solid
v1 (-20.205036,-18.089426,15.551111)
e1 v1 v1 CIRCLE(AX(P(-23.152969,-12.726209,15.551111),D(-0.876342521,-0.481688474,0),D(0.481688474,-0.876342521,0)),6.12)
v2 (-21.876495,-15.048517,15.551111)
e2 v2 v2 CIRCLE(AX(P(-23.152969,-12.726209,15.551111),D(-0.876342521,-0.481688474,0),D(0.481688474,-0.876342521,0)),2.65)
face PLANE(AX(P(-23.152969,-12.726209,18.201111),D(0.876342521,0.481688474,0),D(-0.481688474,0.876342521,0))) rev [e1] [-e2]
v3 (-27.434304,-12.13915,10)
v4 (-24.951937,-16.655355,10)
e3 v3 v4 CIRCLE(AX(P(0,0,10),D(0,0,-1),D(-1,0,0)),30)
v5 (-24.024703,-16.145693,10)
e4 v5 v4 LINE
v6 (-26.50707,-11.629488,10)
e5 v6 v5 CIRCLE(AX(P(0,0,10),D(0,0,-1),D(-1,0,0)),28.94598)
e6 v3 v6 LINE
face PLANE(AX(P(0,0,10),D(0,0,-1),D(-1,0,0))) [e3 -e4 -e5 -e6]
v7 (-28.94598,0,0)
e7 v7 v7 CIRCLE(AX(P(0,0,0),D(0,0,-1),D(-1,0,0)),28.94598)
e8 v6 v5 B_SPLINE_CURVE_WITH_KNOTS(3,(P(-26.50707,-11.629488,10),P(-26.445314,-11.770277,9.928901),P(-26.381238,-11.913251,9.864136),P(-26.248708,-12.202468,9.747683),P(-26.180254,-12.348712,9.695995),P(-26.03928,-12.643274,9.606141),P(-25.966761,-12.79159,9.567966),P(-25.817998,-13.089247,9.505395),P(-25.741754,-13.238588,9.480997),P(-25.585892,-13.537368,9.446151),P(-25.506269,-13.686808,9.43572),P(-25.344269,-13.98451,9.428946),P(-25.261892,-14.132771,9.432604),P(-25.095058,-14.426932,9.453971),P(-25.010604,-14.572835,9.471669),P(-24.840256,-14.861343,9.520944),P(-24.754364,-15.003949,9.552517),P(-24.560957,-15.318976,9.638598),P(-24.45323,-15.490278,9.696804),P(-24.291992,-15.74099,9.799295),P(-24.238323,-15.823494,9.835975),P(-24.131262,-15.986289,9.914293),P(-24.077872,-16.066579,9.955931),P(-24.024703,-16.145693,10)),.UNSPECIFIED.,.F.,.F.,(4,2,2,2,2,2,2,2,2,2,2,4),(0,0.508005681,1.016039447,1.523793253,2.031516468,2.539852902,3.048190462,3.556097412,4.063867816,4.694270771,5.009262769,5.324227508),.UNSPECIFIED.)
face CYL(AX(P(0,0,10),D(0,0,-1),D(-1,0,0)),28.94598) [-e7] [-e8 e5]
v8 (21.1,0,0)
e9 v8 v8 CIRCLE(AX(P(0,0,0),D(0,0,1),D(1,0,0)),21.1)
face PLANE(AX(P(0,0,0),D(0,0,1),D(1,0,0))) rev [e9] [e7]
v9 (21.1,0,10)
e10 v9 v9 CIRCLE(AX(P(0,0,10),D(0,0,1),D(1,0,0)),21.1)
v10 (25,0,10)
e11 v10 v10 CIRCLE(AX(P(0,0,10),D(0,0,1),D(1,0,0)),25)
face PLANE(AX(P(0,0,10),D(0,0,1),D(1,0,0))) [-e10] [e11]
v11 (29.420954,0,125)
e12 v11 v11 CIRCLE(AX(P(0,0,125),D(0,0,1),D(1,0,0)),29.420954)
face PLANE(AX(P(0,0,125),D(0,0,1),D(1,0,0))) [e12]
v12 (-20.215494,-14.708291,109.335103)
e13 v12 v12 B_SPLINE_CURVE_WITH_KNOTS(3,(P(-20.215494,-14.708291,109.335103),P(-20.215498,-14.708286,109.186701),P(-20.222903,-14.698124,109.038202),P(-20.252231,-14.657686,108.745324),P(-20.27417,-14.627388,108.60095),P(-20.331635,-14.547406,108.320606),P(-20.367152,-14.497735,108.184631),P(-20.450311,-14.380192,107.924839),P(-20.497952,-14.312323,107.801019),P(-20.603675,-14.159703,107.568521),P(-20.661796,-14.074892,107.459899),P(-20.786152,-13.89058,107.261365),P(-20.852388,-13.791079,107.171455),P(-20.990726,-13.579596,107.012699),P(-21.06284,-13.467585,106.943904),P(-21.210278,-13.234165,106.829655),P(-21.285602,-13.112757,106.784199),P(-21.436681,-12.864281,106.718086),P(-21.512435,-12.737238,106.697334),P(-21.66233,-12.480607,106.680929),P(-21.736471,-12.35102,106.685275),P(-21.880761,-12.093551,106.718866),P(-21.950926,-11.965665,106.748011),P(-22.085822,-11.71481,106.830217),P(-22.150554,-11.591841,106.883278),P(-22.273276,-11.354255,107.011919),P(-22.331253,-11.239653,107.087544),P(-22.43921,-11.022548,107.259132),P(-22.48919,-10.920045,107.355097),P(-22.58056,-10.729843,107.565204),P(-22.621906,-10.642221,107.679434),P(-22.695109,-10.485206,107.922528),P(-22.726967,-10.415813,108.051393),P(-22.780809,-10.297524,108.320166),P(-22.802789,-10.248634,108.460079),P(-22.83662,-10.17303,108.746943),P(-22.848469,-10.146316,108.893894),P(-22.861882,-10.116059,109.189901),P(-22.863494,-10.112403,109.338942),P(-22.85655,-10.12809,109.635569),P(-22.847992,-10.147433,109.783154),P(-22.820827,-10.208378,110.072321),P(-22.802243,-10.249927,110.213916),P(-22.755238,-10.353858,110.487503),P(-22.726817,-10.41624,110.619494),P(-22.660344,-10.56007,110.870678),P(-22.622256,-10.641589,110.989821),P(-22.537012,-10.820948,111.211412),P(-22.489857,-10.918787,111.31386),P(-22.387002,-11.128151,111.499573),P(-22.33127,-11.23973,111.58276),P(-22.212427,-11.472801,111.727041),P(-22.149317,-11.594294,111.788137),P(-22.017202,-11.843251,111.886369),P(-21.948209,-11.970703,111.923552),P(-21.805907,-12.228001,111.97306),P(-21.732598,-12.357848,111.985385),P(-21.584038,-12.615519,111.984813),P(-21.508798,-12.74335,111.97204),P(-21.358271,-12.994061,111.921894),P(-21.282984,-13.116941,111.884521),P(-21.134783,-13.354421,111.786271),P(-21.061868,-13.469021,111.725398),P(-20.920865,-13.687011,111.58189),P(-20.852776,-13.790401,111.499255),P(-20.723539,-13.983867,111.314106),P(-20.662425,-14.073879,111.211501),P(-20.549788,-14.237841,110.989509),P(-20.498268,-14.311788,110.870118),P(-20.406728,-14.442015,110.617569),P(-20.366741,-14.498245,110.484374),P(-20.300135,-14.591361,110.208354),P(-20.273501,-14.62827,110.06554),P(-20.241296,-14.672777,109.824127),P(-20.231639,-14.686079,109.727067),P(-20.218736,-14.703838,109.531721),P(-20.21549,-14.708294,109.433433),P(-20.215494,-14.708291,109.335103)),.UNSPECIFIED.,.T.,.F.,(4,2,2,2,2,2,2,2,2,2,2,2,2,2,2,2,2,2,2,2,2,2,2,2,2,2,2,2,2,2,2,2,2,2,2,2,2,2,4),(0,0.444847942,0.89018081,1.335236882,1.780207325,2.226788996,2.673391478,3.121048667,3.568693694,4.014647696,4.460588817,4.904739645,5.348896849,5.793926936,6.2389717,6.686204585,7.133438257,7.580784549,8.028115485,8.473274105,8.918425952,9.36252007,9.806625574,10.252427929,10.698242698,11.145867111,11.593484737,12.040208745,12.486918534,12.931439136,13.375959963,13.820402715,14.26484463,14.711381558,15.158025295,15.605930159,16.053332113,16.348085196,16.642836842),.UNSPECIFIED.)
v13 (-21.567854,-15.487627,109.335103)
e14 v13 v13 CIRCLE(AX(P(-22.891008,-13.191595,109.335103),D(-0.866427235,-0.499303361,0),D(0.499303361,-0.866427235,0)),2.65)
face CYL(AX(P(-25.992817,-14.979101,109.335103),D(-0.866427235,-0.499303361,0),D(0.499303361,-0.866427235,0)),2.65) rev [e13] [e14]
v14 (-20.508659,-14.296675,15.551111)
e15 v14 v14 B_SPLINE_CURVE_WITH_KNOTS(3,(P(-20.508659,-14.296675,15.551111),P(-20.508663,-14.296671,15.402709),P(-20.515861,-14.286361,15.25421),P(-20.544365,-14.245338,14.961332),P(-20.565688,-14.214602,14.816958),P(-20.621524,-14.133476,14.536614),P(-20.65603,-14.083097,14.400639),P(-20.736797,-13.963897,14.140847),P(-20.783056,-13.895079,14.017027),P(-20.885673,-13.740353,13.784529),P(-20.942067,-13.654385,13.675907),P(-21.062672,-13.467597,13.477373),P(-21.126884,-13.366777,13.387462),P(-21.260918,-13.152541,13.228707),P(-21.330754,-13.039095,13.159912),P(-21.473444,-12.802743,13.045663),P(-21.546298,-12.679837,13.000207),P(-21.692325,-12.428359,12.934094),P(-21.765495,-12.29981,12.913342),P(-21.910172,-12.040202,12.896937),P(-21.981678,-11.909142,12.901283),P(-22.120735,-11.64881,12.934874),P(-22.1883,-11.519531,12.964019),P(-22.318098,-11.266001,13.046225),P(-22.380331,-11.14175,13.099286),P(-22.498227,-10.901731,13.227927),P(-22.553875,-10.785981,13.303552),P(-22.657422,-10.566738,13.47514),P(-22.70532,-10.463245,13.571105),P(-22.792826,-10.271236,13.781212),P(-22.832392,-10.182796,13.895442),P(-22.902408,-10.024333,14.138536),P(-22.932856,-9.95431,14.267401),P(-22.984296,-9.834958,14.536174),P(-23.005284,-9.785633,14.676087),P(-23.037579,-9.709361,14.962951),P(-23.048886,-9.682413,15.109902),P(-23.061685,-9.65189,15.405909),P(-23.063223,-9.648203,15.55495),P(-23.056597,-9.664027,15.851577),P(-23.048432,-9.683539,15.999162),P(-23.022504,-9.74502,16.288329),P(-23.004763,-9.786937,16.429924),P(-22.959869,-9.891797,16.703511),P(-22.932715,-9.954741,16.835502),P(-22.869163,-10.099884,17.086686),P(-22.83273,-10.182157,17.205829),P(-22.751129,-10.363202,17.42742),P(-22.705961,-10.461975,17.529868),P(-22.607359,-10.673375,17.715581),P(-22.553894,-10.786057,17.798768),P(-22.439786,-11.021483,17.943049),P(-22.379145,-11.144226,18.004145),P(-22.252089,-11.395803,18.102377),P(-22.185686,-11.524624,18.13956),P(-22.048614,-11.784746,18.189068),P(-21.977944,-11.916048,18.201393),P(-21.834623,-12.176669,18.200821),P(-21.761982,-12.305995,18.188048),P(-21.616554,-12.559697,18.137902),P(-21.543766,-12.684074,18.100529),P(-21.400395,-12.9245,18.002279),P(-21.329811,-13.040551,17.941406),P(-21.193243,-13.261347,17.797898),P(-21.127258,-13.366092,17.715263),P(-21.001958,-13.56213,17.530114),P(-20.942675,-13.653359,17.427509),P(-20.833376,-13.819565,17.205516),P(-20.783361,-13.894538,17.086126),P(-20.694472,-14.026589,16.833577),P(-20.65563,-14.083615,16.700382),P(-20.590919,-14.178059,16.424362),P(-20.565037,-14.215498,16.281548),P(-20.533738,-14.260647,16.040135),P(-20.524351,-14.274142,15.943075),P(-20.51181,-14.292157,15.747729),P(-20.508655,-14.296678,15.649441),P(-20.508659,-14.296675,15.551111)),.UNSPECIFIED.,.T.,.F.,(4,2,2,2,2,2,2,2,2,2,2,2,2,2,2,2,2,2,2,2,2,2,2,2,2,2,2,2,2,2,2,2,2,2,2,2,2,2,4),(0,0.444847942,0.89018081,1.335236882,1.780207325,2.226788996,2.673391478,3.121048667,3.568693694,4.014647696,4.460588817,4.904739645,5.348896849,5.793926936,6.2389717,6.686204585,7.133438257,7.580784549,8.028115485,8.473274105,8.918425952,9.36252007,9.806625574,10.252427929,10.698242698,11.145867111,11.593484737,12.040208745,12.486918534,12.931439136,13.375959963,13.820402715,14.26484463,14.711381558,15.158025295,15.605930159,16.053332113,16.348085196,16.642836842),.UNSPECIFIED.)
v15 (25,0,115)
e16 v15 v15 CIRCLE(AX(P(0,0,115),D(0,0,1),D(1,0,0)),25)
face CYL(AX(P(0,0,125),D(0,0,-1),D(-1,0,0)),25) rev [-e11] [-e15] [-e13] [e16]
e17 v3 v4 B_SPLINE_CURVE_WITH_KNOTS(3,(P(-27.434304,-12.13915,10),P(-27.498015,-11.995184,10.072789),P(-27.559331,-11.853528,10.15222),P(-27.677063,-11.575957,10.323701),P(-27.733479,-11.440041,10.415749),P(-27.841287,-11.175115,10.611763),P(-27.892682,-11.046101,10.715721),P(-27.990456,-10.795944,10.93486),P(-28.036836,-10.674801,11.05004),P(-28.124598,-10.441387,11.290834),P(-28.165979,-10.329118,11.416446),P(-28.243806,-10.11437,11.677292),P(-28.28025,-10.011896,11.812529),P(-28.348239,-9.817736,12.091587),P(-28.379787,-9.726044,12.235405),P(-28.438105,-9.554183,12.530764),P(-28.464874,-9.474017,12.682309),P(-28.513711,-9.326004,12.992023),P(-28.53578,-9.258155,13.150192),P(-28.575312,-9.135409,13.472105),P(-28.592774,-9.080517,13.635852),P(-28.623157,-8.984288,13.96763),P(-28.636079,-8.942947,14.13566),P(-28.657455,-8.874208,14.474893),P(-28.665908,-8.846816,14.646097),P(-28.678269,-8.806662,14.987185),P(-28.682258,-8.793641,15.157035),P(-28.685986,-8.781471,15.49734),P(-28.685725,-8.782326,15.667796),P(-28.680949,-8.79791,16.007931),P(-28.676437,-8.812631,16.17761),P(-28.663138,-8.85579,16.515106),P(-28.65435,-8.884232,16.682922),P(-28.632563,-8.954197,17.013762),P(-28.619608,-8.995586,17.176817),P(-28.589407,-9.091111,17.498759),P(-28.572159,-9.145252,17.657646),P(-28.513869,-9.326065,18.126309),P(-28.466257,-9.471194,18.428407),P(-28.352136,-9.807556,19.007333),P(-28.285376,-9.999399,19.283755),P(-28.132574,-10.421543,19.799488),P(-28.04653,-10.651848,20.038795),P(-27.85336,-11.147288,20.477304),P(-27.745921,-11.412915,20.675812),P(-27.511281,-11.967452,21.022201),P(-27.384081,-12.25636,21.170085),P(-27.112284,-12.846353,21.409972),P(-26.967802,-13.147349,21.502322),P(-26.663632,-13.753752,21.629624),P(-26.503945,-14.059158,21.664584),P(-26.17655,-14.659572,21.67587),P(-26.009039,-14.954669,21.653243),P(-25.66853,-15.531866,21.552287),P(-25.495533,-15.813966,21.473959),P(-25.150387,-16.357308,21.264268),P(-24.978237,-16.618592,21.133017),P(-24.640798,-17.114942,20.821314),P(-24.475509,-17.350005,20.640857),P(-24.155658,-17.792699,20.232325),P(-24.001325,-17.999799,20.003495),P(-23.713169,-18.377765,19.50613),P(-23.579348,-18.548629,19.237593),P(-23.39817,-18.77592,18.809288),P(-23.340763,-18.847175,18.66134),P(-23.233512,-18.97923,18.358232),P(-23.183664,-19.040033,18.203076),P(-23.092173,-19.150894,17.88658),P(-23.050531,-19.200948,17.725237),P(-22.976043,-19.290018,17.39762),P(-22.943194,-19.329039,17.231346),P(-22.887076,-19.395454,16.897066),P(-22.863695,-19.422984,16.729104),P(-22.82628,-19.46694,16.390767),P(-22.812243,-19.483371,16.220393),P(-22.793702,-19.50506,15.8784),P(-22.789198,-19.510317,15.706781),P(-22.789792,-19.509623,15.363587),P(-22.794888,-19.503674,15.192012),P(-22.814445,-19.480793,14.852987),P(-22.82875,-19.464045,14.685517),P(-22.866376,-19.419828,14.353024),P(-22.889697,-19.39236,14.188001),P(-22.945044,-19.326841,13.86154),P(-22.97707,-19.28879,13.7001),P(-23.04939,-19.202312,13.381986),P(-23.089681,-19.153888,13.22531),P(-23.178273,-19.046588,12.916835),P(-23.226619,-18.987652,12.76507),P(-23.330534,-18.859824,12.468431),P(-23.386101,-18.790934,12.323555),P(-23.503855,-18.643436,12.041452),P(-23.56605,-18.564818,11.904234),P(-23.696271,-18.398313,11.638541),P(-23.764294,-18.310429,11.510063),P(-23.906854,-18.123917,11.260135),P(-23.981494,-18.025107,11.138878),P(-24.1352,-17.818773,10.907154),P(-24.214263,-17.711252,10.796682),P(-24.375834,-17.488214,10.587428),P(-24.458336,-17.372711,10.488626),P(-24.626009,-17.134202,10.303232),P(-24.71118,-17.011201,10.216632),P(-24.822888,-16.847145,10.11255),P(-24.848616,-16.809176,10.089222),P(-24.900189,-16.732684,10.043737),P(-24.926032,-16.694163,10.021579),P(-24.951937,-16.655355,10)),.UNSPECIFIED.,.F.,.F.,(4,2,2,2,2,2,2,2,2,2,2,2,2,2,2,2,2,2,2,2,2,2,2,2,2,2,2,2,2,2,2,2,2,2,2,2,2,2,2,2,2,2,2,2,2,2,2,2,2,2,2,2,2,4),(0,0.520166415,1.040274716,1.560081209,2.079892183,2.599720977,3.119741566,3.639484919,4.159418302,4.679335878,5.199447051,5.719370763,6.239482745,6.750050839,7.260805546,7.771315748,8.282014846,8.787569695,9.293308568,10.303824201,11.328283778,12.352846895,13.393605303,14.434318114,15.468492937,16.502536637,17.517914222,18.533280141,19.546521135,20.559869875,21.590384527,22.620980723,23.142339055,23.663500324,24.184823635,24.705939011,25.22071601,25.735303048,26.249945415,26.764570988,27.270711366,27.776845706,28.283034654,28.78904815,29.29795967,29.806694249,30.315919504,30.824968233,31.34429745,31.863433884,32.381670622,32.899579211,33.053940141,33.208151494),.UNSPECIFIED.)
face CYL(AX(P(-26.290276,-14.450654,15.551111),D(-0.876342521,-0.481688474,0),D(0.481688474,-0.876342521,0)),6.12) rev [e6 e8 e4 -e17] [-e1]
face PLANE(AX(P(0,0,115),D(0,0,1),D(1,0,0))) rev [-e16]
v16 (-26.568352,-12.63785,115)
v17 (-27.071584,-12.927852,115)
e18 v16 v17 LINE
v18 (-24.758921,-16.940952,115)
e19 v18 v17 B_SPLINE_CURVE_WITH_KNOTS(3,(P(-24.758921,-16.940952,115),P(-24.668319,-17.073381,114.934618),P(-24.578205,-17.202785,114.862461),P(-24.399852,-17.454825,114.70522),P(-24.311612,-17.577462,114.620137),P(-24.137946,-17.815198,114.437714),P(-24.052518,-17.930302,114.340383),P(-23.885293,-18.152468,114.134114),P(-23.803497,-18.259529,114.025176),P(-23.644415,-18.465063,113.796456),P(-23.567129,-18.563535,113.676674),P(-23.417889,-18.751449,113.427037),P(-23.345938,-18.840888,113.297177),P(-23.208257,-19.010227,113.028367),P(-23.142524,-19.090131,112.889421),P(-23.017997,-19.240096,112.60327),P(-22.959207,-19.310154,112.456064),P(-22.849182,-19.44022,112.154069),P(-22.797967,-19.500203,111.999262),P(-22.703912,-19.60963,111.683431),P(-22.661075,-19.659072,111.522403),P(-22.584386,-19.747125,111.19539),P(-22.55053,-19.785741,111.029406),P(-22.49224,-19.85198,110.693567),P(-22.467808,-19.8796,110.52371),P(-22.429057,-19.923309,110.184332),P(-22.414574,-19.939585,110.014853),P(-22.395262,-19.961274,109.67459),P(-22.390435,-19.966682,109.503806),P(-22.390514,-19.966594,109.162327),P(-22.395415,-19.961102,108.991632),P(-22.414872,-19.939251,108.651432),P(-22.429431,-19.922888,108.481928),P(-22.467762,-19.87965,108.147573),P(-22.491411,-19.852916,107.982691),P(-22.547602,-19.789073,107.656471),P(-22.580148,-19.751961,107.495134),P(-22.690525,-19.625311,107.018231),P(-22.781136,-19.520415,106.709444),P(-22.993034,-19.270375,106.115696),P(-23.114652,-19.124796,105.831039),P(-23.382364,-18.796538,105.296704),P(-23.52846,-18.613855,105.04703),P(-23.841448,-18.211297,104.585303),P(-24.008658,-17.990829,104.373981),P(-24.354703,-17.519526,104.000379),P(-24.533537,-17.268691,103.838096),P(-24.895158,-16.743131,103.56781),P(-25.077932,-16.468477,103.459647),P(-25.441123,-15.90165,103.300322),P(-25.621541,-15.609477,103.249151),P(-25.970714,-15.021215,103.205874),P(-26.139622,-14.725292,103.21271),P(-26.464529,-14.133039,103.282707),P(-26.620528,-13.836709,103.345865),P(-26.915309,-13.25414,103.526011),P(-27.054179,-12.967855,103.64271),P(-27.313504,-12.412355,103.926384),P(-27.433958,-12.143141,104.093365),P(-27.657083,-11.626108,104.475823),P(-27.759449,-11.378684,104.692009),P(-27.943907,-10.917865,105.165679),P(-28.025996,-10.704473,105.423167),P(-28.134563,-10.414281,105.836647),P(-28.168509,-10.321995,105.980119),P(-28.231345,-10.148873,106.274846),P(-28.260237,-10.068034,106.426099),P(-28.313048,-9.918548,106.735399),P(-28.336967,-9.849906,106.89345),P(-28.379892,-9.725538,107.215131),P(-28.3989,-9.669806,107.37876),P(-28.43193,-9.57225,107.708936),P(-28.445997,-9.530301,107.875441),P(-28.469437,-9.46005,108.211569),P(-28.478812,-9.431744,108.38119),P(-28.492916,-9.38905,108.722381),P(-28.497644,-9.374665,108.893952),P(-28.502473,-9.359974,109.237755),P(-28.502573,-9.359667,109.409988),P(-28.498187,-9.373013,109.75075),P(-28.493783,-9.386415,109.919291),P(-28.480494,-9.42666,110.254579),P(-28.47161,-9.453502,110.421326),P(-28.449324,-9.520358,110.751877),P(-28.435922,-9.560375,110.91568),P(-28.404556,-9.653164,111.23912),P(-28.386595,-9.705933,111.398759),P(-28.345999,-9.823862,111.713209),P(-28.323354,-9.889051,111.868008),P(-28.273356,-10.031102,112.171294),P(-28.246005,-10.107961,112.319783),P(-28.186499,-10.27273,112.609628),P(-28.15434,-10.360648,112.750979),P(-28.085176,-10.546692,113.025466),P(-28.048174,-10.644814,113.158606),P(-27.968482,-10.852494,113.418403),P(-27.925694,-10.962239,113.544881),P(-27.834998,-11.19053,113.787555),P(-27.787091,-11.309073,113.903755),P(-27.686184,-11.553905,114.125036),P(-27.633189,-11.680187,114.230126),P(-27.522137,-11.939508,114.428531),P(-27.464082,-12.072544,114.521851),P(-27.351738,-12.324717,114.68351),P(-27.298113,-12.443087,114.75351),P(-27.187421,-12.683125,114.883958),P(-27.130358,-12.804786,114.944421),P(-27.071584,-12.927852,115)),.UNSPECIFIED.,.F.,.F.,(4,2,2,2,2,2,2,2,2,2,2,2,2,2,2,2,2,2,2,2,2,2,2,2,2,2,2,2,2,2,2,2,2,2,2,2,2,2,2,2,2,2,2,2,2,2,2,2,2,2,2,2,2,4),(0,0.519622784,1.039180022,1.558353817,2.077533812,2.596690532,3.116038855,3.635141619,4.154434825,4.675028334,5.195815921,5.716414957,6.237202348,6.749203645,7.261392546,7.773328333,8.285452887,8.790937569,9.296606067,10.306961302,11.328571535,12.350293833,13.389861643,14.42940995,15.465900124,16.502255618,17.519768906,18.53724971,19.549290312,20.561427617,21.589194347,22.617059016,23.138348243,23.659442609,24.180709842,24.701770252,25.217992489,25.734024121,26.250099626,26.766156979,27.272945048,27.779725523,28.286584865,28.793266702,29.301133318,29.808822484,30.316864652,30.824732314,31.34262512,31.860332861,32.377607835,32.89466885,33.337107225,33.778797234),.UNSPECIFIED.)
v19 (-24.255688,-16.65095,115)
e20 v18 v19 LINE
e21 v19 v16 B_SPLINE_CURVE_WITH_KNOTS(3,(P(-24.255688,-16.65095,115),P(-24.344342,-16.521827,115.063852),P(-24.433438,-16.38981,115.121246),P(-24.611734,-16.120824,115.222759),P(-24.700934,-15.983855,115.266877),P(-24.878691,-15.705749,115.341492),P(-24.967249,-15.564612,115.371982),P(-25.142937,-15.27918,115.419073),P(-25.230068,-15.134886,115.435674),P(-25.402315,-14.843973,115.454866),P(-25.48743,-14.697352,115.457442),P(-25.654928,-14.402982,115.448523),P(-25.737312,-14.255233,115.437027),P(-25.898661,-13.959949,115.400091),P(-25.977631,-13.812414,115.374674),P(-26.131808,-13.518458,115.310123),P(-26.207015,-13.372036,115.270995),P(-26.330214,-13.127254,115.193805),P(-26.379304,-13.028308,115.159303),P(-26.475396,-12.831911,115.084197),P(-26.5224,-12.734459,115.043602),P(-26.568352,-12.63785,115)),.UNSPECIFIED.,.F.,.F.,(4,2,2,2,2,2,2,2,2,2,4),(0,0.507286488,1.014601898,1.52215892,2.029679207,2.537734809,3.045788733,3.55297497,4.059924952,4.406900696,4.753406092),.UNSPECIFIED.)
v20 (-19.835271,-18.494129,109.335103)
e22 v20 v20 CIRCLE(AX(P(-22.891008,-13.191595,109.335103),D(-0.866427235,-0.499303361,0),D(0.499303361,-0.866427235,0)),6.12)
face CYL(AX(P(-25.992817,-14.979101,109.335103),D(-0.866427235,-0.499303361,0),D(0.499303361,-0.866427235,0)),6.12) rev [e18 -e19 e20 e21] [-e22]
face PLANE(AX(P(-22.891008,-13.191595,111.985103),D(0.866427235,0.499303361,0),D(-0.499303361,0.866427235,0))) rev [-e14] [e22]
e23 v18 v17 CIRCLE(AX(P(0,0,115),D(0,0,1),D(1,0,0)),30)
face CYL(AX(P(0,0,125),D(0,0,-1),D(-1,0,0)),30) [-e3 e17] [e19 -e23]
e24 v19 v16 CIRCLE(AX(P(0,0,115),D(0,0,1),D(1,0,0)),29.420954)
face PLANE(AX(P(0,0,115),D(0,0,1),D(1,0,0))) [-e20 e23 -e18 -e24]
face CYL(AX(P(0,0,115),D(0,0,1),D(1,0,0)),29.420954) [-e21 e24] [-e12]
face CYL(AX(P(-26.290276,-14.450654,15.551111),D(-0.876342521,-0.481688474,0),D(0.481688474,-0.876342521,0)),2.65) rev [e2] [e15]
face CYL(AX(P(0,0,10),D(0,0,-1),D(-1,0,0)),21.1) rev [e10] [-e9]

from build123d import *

# Parameters (mm, degrees)
SKETCH1_R                               = 30
SKETCH1_R_2                             = 25
BOSS_EXTRUDE1_DEPTH                     = 125
SKETCH2_R                               = 25
SKETCH2_R_2                             = 21.1
BOSS_EXTRUDE2_DEPTH                     = 10
SKETCH3_R                               = 25
BOSS_EXTRUDE3_DEPTH                     = 10
SKETCH11_R                              = 30
SKETCH11_R_2                            = 28.945980101
CUT_EXTRUDE2_DEPTH                      = 10
CUT_EXTRUDE3_START                      = -10
SKETCH12_R                              = 30
SKETCH12_R_2                            = 29.420954363
CUT_EXTRUDE3_DEPTH                      = 10
CBORE_START                             = -30.0000001
CBORE_FOR_M5_HEX_HEAD_BOLT2_OUTLINE_R   = 6.12
CBORE_FOR_M5_HEX_HEAD_BOLT2_DEPTH       = 3.5800001
CBORE_START_2                           = -26.42
CBORE_FOR_M5_HEX_HEAD_BOLT2_2_OUTLINE_R = 2.65
CBORE_FOR_M5_HEX_HEAD_BOLT2_2_DEPTH     = 1.560846858
CBORE_FOR_M5_HEX_HEAD_BOLT2_3_OUTLINE_R = 6.12
CBORE_FOR_M5_HEX_HEAD_BOLT2_3_DEPTH     = 3.5800001
CBORE_FOR_M5_HEX_HEAD_BOLT2_4_OUTLINE_R = 2.65
CBORE_FOR_M5_HEX_HEAD_BOLT2_4_DEPTH     = 1.560846858


# Read off the part's stored shape, not the designer's step: CBORE for M5 Hex Head Bolt2
with BuildPart() as part:
    # Sketch1 → Boss-Extrude1 (new body)
    with BuildSketch(Plane.XY):
        Circle(SKETCH1_R)
        Circle(SKETCH1_R_2, mode=Mode.SUBTRACT)
    extrude(amount=BOSS_EXTRUDE1_DEPTH)

    # Sketch2 → Boss-Extrude2 (add)
    with BuildSketch(Plane.XY):
        Circle(SKETCH2_R)
        Circle(SKETCH2_R_2, mode=Mode.SUBTRACT)
    extrude(amount=BOSS_EXTRUDE2_DEPTH)

    # Sketch3 → Boss-Extrude3 (add)
    with BuildSketch(Plane.XY.offset(115)):
        Circle(SKETCH3_R)
    extrude(amount=BOSS_EXTRUDE3_DEPTH)

    # Sketch11 → Cut-Extrude2 (cut)
    with BuildSketch(Plane(origin=(0, 0, 0), x_dir=(-1, 0, 0), z_dir=(0, 0, -1))):
        Circle(SKETCH11_R)
        Circle(SKETCH11_R_2, mode=Mode.SUBTRACT)
    extrude(amount=-CUT_EXTRUDE2_DEPTH, mode=Mode.SUBTRACT)

    # Sketch12 → Cut-Extrude3 (cut)
    with BuildSketch(Plane.XY.offset(125).offset(CUT_EXTRUDE3_START)):
        with Locations(Location((0, 0, 0), (0, 0, 180))):
            Circle(SKETCH12_R)
        Circle(SKETCH12_R_2, mode=Mode.SUBTRACT)
    extrude(amount=CUT_EXTRUDE3_DEPTH, mode=Mode.SUBTRACT)

    # CBORE for M5 Hex Head Bolt2 outline → CBORE for M5 Hex Head Bolt2 (cut)
    with BuildSketch(Plane(origin=(0, 0, 0), x_dir=(0.48168847359227474, -0.8763425211687177, 0), z_dir=(0.8763425211687177, 0.48168847359227485, 0)).offset(CBORE_START)):
        with Locations((0, -15.551111343)):
            Circle(CBORE_FOR_M5_HEX_HEAD_BOLT2_OUTLINE_R)
    extrude(amount=CBORE_FOR_M5_HEX_HEAD_BOLT2_DEPTH, mode=Mode.SUBTRACT)

    # CBORE for M5 Hex Head Bolt2 2 outline → CBORE for M5 Hex Head Bolt2 2 (cut)
    with BuildSketch(Plane(origin=(0, 0, 0), x_dir=(0.48168847359227474, -0.8763425211687177, 0), z_dir=(0.8763425211687177, 0.48168847359227485, 0)).offset(CBORE_START_2)):
        with Locations((0, -15.551111343)):
            Circle(CBORE_FOR_M5_HEX_HEAD_BOLT2_2_OUTLINE_R)
    extrude(amount=CBORE_FOR_M5_HEX_HEAD_BOLT2_2_DEPTH, mode=Mode.SUBTRACT)

    # CBORE for M5 Hex Head Bolt2 3 outline → CBORE for M5 Hex Head Bolt2 3 (cut)
    with BuildSketch(Plane(origin=(0, 0, 0), x_dir=(0.49930336052922, -0.8664272353546071, 0), z_dir=(0.8664272353546071, 0.49930336052922003, 0)).offset(CBORE_START)):
        with Locations((0, -109.335103389)):
            Circle(CBORE_FOR_M5_HEX_HEAD_BOLT2_3_OUTLINE_R)
    extrude(amount=CBORE_FOR_M5_HEX_HEAD_BOLT2_3_DEPTH, mode=Mode.SUBTRACT)

    # CBORE for M5 Hex Head Bolt2 4 outline → CBORE for M5 Hex Head Bolt2 4 (cut)
    with BuildSketch(Plane(origin=(0, 0, 0), x_dir=(0.49930336052922, -0.8664272353546071, 0), z_dir=(0.8664272353546071, 0.49930336052922003, 0)).offset(CBORE_START_2)):
        with Locations((0, -109.335103389)):
            Circle(CBORE_FOR_M5_HEX_HEAD_BOLT2_4_OUTLINE_R)
    extrude(amount=CBORE_FOR_M5_HEX_HEAD_BOLT2_4_DEPTH, mode=Mode.SUBTRACT)


solid = part.part
